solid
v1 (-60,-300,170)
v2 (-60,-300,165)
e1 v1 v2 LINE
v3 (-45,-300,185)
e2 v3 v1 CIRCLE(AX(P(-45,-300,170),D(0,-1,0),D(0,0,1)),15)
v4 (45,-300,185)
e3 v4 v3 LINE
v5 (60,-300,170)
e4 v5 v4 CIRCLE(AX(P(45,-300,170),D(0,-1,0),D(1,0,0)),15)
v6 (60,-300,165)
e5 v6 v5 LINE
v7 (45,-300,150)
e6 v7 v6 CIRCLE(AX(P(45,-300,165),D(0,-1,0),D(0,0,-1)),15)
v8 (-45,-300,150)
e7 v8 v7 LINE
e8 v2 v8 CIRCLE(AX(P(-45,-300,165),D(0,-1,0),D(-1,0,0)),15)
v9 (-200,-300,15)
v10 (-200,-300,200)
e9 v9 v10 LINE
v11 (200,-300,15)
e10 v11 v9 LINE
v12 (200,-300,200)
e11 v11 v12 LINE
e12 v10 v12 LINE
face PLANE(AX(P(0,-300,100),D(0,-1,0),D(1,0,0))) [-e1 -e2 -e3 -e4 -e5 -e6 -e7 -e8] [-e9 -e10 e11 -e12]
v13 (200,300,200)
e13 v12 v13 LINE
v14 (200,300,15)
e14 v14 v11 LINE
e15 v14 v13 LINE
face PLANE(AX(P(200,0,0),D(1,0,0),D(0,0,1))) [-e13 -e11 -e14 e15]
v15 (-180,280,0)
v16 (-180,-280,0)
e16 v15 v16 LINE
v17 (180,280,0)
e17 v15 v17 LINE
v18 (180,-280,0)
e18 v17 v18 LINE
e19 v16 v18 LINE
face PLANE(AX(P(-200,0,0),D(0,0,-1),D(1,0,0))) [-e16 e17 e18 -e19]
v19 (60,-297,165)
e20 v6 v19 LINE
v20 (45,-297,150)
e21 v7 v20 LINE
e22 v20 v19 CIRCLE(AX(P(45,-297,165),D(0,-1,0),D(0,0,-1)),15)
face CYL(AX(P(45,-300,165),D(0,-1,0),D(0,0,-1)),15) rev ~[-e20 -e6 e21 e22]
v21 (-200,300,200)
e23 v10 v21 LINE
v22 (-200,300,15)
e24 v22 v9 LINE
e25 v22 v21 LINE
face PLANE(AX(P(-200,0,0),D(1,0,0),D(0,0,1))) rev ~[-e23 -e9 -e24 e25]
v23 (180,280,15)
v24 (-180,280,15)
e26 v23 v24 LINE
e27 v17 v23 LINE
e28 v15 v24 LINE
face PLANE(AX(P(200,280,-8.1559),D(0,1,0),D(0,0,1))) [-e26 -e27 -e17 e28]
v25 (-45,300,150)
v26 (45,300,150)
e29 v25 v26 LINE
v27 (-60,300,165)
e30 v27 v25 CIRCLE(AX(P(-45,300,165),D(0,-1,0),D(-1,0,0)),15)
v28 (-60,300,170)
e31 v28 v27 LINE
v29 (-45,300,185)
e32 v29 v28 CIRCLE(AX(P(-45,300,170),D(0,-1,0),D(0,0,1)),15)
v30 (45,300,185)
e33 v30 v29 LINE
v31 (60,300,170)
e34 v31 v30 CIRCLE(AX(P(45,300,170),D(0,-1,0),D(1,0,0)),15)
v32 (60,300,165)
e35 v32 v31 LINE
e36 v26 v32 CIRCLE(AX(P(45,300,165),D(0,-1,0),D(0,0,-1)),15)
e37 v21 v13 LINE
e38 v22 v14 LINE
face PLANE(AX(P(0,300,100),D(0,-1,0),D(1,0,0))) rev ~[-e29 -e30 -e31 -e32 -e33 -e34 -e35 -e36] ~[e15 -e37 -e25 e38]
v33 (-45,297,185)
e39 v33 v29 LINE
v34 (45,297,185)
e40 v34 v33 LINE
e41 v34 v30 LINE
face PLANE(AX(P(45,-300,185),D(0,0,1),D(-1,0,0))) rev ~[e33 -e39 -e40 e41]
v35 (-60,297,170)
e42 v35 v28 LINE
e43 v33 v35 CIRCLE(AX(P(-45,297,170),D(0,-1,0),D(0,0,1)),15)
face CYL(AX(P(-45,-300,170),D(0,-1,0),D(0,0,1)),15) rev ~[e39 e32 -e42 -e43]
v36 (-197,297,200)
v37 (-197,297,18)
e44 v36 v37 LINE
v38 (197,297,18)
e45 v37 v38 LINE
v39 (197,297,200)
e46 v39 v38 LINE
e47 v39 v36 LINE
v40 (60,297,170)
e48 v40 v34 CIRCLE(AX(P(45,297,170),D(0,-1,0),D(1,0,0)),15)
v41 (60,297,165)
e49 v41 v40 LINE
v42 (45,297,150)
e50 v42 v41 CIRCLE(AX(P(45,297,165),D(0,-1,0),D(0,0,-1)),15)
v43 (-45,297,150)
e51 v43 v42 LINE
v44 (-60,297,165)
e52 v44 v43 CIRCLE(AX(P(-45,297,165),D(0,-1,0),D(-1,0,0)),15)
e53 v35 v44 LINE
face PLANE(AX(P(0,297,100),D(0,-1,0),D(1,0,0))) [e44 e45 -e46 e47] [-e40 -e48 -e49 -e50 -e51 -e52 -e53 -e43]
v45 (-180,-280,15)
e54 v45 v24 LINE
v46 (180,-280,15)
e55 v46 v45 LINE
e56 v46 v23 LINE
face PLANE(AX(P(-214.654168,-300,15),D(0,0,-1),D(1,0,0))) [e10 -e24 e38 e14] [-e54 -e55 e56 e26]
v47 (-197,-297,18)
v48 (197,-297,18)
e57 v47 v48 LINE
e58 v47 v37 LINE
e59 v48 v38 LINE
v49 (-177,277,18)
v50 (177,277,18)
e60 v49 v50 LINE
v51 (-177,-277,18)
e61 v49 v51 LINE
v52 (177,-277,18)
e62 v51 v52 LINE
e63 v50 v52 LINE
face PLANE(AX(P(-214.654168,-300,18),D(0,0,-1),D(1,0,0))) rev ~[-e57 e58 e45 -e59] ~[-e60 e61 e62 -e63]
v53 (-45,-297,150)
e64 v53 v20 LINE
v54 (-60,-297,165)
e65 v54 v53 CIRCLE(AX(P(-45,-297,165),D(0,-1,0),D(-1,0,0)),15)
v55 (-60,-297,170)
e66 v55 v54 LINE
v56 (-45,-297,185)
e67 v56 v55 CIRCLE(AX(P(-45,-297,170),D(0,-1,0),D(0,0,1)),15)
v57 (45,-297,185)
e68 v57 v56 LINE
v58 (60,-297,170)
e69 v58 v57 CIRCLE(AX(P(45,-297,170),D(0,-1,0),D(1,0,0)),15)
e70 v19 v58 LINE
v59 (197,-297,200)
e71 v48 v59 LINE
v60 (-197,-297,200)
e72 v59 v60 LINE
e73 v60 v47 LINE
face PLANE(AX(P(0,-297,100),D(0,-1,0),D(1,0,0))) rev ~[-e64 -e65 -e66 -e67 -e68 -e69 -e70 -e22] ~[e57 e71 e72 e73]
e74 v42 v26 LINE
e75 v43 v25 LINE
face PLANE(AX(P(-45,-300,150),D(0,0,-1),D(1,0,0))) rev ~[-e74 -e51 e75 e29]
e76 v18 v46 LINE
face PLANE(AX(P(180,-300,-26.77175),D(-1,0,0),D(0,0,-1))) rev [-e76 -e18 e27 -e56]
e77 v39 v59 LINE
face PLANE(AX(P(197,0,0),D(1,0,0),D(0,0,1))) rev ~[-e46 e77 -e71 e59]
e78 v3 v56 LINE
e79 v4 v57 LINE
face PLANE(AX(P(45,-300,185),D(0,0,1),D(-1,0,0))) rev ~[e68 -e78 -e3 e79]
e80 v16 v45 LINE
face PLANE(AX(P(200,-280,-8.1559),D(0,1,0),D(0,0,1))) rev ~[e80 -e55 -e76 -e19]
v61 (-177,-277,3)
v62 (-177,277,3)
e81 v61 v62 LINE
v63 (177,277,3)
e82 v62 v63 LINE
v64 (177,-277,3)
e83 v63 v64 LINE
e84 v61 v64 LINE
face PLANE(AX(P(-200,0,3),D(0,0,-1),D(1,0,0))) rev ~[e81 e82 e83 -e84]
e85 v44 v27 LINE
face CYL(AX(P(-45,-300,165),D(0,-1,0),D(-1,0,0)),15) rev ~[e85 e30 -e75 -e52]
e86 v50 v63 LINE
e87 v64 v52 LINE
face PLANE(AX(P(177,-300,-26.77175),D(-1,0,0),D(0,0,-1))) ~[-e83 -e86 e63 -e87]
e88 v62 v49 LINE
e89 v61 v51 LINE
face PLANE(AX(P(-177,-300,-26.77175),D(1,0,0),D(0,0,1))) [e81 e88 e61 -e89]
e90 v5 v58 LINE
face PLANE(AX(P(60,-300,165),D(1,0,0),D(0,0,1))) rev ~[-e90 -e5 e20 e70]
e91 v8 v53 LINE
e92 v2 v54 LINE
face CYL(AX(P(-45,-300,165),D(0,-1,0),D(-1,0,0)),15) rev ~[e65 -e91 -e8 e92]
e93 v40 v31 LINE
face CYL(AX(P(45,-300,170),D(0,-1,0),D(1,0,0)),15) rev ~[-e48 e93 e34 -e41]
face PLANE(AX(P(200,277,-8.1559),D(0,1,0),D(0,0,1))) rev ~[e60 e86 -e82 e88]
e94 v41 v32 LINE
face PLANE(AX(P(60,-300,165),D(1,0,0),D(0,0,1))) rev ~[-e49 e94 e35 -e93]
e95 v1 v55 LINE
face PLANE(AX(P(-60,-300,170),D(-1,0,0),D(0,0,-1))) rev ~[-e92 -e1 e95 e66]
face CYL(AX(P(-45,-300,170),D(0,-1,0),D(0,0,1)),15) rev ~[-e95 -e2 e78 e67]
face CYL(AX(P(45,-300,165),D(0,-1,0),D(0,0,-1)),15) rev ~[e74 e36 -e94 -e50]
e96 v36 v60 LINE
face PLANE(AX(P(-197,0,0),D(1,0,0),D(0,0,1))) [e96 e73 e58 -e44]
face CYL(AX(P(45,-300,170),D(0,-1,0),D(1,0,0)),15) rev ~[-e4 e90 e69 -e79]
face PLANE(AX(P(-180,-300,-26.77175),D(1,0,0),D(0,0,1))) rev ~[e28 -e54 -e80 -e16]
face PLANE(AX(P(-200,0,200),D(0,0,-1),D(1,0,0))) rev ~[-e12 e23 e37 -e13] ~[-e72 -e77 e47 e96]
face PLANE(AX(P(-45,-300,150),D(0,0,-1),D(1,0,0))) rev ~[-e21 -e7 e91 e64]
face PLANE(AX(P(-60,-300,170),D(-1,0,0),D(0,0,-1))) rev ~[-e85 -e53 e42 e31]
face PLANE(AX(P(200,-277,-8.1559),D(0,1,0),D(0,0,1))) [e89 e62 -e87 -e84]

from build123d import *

# Parameters (mm, degrees)
F0_W     = 400
F0_H     = 200
F1_DEPTH = 300
F2_W     = 34.6541681295
F2_H     = 41.7717497936
F3_DEPTH = 600.001
F4_W     = 32.9372721782
F4_H     = 23.155899561
F5_DEPTH = 400.001
F6_T     = -3
F8_DEPTH = 600.001


# Not quite as in the source:
# - a pattern or mirror of a feature is missing from the dataset's text; its kind, count and spacing are read off the source's solid


with BuildPart() as f1:
    # F0 (on Front) → F1 (new body, symmetric)
    with BuildSketch(Plane.XZ):
        with Locations((0, 100)):
            Rectangle(F0_W, F0_H)
    extrude(amount=F1_DEPTH, both=True)

    # F2 (on face) → F3 (cut, through all)
    with BuildSketch(Plane.XZ.offset(300)):
        with Locations((-197.3270840647, -5.8858748968)):
            Rectangle(F2_W, F2_H)
    f3 = extrude(amount=-F3_DEPTH, mode=Mode.SUBTRACT)

    # F3_copies: F3 across plane
    add(f3.mirror(Plane(origin=(0, 0, 0), x_dir=(0, 0, 1), z_dir=(1, 0, 0))), mode=Mode.SUBTRACT)

    # F4 (on face) → F5 (cut, through all)
    with BuildSketch(Plane.YZ.offset(200)):
        with Locations((-296.4686360891, 3.4220502195)):
            Rectangle(F4_W, F4_H)
        with Locations((296.4686360891, 3.4220502195)):
            Rectangle(F4_W, F4_H)
    extrude(amount=-F5_DEPTH, mode=Mode.SUBTRACT)

    # F6
    f6_openings = [f1.faces().sort_by_distance(p)[0] for p in [
        (0, 0, 200),
    ]]
    offset(amount=F6_T, openings=f6_openings, kind=Kind.INTERSECTION)

    # F7 (on face) → F8 (cut, through all)
    with BuildSketch(Plane.XZ.offset(300)):
        with BuildLine():
            Line((45, 185), (-45, 185))
            ThreePointArc((-45, 185), (-55.6066017178, 180.6066017178), (-60, 170))
            Line((-60, 170), (-60, 165))
            ThreePointArc((-60, 165), (-55.6066017178, 154.3933982822), (-45, 150))
            Line((-45, 150), (45, 150))
            ThreePointArc((45, 150), (55.6066017178, 154.3933982822), (60, 165))
            Line((60, 165), (60, 170))
            ThreePointArc((60, 170), (55.6066017178, 180.6066017178), (45, 185))
        make_face()
    extrude(amount=-F8_DEPTH, mode=Mode.SUBTRACT)


solid = f1.part
